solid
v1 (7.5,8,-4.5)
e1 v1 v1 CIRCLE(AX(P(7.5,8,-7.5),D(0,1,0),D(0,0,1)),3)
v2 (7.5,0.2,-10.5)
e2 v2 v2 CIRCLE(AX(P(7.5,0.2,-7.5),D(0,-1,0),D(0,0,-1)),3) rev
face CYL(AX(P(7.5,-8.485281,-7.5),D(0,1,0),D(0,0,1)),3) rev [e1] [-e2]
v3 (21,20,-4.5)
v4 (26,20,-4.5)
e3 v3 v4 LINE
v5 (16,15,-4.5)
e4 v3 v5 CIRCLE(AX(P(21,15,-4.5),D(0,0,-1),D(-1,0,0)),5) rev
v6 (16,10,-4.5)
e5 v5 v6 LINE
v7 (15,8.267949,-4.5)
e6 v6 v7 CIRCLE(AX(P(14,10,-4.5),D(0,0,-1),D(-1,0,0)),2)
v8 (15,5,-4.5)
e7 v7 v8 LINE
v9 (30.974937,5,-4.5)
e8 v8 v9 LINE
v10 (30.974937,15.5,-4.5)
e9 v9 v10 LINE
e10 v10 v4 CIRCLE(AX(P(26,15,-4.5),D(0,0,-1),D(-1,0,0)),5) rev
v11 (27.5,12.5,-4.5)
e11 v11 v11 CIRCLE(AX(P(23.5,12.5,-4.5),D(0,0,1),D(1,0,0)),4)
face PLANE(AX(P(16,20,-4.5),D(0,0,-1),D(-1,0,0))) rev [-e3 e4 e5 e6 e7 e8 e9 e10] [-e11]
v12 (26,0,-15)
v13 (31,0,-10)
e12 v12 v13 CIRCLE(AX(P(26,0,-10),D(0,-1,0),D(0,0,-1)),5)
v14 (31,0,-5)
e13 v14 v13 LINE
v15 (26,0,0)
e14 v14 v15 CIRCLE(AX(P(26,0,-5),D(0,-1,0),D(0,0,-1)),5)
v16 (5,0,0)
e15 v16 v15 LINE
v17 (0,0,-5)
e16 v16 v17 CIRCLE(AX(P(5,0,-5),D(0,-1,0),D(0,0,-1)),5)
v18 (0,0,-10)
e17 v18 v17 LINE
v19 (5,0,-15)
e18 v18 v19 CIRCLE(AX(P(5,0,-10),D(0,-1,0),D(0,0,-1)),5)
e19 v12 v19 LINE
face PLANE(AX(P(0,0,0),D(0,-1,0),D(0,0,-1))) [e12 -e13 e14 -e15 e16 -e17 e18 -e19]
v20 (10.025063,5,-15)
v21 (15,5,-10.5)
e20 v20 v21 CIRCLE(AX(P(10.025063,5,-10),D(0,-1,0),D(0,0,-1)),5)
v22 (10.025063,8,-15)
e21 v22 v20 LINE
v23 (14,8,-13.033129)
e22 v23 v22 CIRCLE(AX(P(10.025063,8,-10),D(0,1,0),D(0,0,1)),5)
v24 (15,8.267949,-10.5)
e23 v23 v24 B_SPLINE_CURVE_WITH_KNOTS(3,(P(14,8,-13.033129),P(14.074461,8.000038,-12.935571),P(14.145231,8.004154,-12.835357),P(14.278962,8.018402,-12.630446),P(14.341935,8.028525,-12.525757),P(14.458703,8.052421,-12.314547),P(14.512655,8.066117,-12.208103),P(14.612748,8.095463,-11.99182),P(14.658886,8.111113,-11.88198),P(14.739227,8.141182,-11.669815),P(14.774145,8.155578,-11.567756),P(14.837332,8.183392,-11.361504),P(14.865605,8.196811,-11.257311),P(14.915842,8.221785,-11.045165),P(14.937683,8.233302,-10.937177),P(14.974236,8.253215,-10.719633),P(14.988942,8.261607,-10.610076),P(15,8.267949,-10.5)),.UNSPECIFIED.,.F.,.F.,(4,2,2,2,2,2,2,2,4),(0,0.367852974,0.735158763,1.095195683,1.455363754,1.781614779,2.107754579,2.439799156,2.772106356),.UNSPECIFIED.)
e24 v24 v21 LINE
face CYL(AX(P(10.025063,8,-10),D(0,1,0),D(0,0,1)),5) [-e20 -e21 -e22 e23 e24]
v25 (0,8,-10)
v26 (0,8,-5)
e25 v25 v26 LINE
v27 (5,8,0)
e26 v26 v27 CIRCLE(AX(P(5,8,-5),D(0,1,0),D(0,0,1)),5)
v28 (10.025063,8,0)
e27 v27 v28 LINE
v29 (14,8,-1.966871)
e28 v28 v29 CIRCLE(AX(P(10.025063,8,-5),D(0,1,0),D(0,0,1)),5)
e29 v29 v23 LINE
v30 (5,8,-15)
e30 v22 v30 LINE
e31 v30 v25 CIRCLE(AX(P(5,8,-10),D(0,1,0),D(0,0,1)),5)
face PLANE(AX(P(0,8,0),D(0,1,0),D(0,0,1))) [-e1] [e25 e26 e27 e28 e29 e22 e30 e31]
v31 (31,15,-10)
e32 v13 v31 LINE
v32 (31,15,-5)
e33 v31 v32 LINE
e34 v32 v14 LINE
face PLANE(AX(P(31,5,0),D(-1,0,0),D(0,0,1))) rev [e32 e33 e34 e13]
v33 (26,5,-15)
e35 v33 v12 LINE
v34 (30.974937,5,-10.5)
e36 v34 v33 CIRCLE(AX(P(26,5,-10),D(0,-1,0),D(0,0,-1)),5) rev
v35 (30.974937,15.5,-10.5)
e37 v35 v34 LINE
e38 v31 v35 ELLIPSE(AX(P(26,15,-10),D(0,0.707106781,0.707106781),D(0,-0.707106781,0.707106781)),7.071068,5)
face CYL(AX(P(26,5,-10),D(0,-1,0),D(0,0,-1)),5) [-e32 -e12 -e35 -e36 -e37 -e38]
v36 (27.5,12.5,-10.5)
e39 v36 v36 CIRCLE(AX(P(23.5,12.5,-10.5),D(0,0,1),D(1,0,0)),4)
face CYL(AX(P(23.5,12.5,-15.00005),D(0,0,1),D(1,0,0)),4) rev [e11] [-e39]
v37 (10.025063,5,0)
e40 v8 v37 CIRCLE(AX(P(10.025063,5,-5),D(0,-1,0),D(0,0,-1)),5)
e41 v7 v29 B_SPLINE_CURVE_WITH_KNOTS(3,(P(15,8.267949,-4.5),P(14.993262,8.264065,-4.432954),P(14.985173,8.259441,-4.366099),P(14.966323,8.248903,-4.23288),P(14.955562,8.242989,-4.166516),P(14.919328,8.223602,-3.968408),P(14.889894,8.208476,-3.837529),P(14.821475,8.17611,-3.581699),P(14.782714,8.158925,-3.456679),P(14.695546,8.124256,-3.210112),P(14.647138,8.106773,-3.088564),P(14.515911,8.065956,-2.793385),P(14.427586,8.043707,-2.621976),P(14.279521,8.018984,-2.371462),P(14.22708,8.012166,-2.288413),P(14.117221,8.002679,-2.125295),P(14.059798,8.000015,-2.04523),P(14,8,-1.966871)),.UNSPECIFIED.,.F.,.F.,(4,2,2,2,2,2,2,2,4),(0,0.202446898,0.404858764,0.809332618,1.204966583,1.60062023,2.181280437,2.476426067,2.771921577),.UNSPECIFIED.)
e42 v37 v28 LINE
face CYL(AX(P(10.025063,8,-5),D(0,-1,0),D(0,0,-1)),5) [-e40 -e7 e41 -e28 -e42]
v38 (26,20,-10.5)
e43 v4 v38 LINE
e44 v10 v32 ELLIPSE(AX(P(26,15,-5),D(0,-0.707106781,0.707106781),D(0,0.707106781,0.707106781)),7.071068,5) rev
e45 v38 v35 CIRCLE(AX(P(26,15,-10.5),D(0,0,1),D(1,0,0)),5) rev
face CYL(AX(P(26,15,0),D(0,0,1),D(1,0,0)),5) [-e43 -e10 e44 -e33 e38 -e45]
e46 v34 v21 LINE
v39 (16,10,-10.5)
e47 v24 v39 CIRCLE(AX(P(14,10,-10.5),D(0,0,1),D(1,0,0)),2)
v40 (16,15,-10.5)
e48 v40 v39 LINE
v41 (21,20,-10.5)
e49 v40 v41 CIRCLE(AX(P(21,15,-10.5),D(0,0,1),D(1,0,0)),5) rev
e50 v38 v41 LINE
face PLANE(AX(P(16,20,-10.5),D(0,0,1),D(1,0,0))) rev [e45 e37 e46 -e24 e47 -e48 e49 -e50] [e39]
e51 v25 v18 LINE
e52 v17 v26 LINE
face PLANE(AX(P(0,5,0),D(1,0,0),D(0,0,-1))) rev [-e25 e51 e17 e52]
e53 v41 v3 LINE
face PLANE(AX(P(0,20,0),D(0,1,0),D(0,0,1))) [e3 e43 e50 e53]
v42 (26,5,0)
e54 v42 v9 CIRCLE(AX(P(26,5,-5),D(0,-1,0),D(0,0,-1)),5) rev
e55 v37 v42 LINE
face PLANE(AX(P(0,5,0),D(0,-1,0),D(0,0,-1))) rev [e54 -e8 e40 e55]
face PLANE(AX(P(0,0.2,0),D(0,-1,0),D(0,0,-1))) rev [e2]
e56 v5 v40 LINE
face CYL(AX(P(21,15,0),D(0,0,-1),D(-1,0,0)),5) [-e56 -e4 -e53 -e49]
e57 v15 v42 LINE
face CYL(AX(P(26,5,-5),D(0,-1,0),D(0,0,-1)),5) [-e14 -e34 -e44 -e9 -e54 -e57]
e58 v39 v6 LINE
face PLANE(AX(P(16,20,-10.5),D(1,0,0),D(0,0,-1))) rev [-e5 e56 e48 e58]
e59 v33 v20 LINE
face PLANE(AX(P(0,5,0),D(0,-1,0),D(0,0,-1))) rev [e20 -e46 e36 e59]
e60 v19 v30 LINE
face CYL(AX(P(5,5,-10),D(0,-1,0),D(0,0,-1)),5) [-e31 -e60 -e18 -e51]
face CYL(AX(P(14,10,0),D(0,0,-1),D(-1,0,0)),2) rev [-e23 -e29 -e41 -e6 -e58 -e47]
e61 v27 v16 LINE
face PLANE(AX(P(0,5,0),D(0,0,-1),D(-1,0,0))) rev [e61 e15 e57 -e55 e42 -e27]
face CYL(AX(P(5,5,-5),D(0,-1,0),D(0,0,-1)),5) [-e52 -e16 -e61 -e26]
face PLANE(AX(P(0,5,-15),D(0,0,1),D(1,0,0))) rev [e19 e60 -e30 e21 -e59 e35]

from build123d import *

# Parameters (mm, degrees)
SKETCH1_W           = 31
SKETCH1_H           = 15
BOSS_EXTRUDE1_DEPTH = 5
SKETCH2_W           = 15
SKETCH2_H           = 15
BOSS_EXTRUDE2_DEPTH = 3
SKETCH3_W           = 15
SKETCH3_H           = 6
BOSS_EXTRUDE3_DEPTH = 15
SKETCH4_W           = 1
SKETCH4_H           = 6
RIB_DEPTH           = 3
SKETCH5_R           = 4
CUT_EXTRUDE1_DEPTH  = 39.356876828
SKETCH6_R           = 3
CUT_EXTRUDE2_DEPTH  = 7.8
FILLET1_R           = 5
FILLET2_R           = 5
FILLET3_R           = 2


with BuildPart() as part:
    # Sketch1 → Boss-Extrude1 (new body)
    with BuildSketch(Plane(origin=(0, 0, 0), x_dir=(1, 0, 0), z_dir=(0, 1, 0))):
        with Locations((15.5, 7.5)):
            Rectangle(SKETCH1_W, SKETCH1_H)
    extrude(amount=BOSS_EXTRUDE1_DEPTH)

    # Sketch2 → Boss-Extrude2 (add)
    with BuildSketch(Plane(origin=(0, 5, 0), x_dir=(1, 0, 0), z_dir=(0, 1, 0))):
        with Locations((7.5, 7.5)):
            Rectangle(SKETCH2_W, SKETCH2_H)
    extrude(amount=BOSS_EXTRUDE2_DEPTH)

    # Sketch3 → Boss-Extrude3 (add)
    with BuildSketch(Plane(origin=(0, 5, 0), x_dir=(1, 0, 0), z_dir=(0, 1, 0))):
        with Locations((23.5, 7.5)):
            Rectangle(SKETCH3_W, SKETCH3_H)
    extrude(amount=BOSS_EXTRUDE3_DEPTH)

    # Sketch4 → rib (add)
    with BuildSketch(Plane(origin=(0, 5, 0), x_dir=(1, 0, 0), z_dir=(0, 1, 0))):
        with Locations((15.5, 7.5)):
            Rectangle(SKETCH4_W, SKETCH4_H)
    extrude(amount=RIB_DEPTH)

    # Sketch5 → Cut-Extrude1 (cut, through all)
    with BuildSketch(Plane.XY.offset(-4.5)):
        with Locations((23.5, 12.5)):
            Circle(SKETCH5_R)
    extrude(amount=-CUT_EXTRUDE1_DEPTH, mode=Mode.SUBTRACT)

    # Sketch6 → Cut-Extrude2 (cut)
    with BuildSketch(Plane(origin=(0, 8, 0), x_dir=(1, 0, 0), z_dir=(0, 1, 0))):
        with Locations(Location((7.5, 7.5, 0), (0, 0, 270))):
            Circle(SKETCH6_R)
    extrude(amount=-CUT_EXTRUDE2_DEPTH, mode=Mode.SUBTRACT)

    # Fillet1
    fillet1_edges = [part.edges().sort_by_distance(p)[0] for p in [
        (16, 20, -7.5),
        (31, 20, -7.5),
    ]]
    fillet(fillet1_edges, radius=FILLET1_R)

    # Fillet2
    # the kernel refuses this fillet: 5 mm, written as the material it takes off along each edge
    with BuildSketch(Plane(origin=(31, -12.5, -15), x_dir=(0, 0, 1), z_dir=(0, 1, 0))) as fillet2_piece_1:
        with BuildLine():
            CenterArc((FILLET2_R, -FILLET2_R), FILLET2_R, 90, 90)
            Line((0, -FILLET2_R), (0, 0))
            Line((0, 0), (FILLET2_R, 0))
        make_face()
    extrude(amount=30, mode=Mode.SUBTRACT)
    with BuildSketch(Plane(origin=(31, -12.5, 0), x_dir=(0, 0, -1), z_dir=(0, 1, 0))) as fillet2_piece_2:
        with BuildLine():
            CenterArc((FILLET2_R, FILLET2_R), FILLET2_R, 180, 90)
            Line((0, FILLET2_R), (0, 0))
            Line((0, 0), (FILLET2_R, 0))
        make_face()
    extrude(amount=30, mode=Mode.SUBTRACT)
    with BuildSketch(Plane(origin=(15, 5, -15), x_dir=(-1, 0, 0), z_dir=(0, 1, 0))) as fillet2_piece_3:
        with BuildLine():
            CenterArc((4.974937186, 5), FILLET2_R, 185.739170477, 84.260829523)
            Line((0, 4.5), (0, 0))
            Line((0, 0), (4.974937186, 0))
        make_face()
    extrude(amount=15.437342964, mode=Mode.SUBTRACT)
    with BuildSketch(Plane(origin=(15, 5, 0), x_dir=(-1, 0, 0), z_dir=(0, 1, 0))) as fillet2_piece_4:
        with BuildLine():
            CenterArc((4.974937186, -5), FILLET2_R, 90, 84.260829523)
            Line((0, -4.5), (0, 0))
            Line((0, 0), (4.974937186, 0))
        make_face()
    extrude(amount=15.437342964, mode=Mode.SUBTRACT)
    with BuildSketch(Plane(origin=(0, 20.5, 0), x_dir=(1, 0, 0), z_dir=(0, -1, 0))) as fillet2_piece_5:
        with BuildLine():
            CenterArc((FILLET2_R, -FILLET2_R), FILLET2_R, 90, 90)
            Line((0, -FILLET2_R), (0, 0))
            Line((0, 0), (FILLET2_R, 0))
        make_face()
    extrude(amount=33, mode=Mode.SUBTRACT)
    with BuildSketch(Plane(origin=(0, 20.5, -15), x_dir=(1, 0, 0), z_dir=(0, -1, 0))) as fillet2_piece_6:
        with BuildLine():
            CenterArc((FILLET2_R, FILLET2_R), FILLET2_R, 180, 90)
            Line((0, FILLET2_R), (0, 0))
            Line((0, 0), (FILLET2_R, 0))
        make_face()
    extrude(amount=33, mode=Mode.SUBTRACT)

    # Fillet3
    fillet3_edges = [part.edges().sort_by_distance(p)[0] for p in [
        (16, 8, -7.5),
    ]]
    fillet(fillet3_edges, radius=FILLET3_R)


solid = part.part
